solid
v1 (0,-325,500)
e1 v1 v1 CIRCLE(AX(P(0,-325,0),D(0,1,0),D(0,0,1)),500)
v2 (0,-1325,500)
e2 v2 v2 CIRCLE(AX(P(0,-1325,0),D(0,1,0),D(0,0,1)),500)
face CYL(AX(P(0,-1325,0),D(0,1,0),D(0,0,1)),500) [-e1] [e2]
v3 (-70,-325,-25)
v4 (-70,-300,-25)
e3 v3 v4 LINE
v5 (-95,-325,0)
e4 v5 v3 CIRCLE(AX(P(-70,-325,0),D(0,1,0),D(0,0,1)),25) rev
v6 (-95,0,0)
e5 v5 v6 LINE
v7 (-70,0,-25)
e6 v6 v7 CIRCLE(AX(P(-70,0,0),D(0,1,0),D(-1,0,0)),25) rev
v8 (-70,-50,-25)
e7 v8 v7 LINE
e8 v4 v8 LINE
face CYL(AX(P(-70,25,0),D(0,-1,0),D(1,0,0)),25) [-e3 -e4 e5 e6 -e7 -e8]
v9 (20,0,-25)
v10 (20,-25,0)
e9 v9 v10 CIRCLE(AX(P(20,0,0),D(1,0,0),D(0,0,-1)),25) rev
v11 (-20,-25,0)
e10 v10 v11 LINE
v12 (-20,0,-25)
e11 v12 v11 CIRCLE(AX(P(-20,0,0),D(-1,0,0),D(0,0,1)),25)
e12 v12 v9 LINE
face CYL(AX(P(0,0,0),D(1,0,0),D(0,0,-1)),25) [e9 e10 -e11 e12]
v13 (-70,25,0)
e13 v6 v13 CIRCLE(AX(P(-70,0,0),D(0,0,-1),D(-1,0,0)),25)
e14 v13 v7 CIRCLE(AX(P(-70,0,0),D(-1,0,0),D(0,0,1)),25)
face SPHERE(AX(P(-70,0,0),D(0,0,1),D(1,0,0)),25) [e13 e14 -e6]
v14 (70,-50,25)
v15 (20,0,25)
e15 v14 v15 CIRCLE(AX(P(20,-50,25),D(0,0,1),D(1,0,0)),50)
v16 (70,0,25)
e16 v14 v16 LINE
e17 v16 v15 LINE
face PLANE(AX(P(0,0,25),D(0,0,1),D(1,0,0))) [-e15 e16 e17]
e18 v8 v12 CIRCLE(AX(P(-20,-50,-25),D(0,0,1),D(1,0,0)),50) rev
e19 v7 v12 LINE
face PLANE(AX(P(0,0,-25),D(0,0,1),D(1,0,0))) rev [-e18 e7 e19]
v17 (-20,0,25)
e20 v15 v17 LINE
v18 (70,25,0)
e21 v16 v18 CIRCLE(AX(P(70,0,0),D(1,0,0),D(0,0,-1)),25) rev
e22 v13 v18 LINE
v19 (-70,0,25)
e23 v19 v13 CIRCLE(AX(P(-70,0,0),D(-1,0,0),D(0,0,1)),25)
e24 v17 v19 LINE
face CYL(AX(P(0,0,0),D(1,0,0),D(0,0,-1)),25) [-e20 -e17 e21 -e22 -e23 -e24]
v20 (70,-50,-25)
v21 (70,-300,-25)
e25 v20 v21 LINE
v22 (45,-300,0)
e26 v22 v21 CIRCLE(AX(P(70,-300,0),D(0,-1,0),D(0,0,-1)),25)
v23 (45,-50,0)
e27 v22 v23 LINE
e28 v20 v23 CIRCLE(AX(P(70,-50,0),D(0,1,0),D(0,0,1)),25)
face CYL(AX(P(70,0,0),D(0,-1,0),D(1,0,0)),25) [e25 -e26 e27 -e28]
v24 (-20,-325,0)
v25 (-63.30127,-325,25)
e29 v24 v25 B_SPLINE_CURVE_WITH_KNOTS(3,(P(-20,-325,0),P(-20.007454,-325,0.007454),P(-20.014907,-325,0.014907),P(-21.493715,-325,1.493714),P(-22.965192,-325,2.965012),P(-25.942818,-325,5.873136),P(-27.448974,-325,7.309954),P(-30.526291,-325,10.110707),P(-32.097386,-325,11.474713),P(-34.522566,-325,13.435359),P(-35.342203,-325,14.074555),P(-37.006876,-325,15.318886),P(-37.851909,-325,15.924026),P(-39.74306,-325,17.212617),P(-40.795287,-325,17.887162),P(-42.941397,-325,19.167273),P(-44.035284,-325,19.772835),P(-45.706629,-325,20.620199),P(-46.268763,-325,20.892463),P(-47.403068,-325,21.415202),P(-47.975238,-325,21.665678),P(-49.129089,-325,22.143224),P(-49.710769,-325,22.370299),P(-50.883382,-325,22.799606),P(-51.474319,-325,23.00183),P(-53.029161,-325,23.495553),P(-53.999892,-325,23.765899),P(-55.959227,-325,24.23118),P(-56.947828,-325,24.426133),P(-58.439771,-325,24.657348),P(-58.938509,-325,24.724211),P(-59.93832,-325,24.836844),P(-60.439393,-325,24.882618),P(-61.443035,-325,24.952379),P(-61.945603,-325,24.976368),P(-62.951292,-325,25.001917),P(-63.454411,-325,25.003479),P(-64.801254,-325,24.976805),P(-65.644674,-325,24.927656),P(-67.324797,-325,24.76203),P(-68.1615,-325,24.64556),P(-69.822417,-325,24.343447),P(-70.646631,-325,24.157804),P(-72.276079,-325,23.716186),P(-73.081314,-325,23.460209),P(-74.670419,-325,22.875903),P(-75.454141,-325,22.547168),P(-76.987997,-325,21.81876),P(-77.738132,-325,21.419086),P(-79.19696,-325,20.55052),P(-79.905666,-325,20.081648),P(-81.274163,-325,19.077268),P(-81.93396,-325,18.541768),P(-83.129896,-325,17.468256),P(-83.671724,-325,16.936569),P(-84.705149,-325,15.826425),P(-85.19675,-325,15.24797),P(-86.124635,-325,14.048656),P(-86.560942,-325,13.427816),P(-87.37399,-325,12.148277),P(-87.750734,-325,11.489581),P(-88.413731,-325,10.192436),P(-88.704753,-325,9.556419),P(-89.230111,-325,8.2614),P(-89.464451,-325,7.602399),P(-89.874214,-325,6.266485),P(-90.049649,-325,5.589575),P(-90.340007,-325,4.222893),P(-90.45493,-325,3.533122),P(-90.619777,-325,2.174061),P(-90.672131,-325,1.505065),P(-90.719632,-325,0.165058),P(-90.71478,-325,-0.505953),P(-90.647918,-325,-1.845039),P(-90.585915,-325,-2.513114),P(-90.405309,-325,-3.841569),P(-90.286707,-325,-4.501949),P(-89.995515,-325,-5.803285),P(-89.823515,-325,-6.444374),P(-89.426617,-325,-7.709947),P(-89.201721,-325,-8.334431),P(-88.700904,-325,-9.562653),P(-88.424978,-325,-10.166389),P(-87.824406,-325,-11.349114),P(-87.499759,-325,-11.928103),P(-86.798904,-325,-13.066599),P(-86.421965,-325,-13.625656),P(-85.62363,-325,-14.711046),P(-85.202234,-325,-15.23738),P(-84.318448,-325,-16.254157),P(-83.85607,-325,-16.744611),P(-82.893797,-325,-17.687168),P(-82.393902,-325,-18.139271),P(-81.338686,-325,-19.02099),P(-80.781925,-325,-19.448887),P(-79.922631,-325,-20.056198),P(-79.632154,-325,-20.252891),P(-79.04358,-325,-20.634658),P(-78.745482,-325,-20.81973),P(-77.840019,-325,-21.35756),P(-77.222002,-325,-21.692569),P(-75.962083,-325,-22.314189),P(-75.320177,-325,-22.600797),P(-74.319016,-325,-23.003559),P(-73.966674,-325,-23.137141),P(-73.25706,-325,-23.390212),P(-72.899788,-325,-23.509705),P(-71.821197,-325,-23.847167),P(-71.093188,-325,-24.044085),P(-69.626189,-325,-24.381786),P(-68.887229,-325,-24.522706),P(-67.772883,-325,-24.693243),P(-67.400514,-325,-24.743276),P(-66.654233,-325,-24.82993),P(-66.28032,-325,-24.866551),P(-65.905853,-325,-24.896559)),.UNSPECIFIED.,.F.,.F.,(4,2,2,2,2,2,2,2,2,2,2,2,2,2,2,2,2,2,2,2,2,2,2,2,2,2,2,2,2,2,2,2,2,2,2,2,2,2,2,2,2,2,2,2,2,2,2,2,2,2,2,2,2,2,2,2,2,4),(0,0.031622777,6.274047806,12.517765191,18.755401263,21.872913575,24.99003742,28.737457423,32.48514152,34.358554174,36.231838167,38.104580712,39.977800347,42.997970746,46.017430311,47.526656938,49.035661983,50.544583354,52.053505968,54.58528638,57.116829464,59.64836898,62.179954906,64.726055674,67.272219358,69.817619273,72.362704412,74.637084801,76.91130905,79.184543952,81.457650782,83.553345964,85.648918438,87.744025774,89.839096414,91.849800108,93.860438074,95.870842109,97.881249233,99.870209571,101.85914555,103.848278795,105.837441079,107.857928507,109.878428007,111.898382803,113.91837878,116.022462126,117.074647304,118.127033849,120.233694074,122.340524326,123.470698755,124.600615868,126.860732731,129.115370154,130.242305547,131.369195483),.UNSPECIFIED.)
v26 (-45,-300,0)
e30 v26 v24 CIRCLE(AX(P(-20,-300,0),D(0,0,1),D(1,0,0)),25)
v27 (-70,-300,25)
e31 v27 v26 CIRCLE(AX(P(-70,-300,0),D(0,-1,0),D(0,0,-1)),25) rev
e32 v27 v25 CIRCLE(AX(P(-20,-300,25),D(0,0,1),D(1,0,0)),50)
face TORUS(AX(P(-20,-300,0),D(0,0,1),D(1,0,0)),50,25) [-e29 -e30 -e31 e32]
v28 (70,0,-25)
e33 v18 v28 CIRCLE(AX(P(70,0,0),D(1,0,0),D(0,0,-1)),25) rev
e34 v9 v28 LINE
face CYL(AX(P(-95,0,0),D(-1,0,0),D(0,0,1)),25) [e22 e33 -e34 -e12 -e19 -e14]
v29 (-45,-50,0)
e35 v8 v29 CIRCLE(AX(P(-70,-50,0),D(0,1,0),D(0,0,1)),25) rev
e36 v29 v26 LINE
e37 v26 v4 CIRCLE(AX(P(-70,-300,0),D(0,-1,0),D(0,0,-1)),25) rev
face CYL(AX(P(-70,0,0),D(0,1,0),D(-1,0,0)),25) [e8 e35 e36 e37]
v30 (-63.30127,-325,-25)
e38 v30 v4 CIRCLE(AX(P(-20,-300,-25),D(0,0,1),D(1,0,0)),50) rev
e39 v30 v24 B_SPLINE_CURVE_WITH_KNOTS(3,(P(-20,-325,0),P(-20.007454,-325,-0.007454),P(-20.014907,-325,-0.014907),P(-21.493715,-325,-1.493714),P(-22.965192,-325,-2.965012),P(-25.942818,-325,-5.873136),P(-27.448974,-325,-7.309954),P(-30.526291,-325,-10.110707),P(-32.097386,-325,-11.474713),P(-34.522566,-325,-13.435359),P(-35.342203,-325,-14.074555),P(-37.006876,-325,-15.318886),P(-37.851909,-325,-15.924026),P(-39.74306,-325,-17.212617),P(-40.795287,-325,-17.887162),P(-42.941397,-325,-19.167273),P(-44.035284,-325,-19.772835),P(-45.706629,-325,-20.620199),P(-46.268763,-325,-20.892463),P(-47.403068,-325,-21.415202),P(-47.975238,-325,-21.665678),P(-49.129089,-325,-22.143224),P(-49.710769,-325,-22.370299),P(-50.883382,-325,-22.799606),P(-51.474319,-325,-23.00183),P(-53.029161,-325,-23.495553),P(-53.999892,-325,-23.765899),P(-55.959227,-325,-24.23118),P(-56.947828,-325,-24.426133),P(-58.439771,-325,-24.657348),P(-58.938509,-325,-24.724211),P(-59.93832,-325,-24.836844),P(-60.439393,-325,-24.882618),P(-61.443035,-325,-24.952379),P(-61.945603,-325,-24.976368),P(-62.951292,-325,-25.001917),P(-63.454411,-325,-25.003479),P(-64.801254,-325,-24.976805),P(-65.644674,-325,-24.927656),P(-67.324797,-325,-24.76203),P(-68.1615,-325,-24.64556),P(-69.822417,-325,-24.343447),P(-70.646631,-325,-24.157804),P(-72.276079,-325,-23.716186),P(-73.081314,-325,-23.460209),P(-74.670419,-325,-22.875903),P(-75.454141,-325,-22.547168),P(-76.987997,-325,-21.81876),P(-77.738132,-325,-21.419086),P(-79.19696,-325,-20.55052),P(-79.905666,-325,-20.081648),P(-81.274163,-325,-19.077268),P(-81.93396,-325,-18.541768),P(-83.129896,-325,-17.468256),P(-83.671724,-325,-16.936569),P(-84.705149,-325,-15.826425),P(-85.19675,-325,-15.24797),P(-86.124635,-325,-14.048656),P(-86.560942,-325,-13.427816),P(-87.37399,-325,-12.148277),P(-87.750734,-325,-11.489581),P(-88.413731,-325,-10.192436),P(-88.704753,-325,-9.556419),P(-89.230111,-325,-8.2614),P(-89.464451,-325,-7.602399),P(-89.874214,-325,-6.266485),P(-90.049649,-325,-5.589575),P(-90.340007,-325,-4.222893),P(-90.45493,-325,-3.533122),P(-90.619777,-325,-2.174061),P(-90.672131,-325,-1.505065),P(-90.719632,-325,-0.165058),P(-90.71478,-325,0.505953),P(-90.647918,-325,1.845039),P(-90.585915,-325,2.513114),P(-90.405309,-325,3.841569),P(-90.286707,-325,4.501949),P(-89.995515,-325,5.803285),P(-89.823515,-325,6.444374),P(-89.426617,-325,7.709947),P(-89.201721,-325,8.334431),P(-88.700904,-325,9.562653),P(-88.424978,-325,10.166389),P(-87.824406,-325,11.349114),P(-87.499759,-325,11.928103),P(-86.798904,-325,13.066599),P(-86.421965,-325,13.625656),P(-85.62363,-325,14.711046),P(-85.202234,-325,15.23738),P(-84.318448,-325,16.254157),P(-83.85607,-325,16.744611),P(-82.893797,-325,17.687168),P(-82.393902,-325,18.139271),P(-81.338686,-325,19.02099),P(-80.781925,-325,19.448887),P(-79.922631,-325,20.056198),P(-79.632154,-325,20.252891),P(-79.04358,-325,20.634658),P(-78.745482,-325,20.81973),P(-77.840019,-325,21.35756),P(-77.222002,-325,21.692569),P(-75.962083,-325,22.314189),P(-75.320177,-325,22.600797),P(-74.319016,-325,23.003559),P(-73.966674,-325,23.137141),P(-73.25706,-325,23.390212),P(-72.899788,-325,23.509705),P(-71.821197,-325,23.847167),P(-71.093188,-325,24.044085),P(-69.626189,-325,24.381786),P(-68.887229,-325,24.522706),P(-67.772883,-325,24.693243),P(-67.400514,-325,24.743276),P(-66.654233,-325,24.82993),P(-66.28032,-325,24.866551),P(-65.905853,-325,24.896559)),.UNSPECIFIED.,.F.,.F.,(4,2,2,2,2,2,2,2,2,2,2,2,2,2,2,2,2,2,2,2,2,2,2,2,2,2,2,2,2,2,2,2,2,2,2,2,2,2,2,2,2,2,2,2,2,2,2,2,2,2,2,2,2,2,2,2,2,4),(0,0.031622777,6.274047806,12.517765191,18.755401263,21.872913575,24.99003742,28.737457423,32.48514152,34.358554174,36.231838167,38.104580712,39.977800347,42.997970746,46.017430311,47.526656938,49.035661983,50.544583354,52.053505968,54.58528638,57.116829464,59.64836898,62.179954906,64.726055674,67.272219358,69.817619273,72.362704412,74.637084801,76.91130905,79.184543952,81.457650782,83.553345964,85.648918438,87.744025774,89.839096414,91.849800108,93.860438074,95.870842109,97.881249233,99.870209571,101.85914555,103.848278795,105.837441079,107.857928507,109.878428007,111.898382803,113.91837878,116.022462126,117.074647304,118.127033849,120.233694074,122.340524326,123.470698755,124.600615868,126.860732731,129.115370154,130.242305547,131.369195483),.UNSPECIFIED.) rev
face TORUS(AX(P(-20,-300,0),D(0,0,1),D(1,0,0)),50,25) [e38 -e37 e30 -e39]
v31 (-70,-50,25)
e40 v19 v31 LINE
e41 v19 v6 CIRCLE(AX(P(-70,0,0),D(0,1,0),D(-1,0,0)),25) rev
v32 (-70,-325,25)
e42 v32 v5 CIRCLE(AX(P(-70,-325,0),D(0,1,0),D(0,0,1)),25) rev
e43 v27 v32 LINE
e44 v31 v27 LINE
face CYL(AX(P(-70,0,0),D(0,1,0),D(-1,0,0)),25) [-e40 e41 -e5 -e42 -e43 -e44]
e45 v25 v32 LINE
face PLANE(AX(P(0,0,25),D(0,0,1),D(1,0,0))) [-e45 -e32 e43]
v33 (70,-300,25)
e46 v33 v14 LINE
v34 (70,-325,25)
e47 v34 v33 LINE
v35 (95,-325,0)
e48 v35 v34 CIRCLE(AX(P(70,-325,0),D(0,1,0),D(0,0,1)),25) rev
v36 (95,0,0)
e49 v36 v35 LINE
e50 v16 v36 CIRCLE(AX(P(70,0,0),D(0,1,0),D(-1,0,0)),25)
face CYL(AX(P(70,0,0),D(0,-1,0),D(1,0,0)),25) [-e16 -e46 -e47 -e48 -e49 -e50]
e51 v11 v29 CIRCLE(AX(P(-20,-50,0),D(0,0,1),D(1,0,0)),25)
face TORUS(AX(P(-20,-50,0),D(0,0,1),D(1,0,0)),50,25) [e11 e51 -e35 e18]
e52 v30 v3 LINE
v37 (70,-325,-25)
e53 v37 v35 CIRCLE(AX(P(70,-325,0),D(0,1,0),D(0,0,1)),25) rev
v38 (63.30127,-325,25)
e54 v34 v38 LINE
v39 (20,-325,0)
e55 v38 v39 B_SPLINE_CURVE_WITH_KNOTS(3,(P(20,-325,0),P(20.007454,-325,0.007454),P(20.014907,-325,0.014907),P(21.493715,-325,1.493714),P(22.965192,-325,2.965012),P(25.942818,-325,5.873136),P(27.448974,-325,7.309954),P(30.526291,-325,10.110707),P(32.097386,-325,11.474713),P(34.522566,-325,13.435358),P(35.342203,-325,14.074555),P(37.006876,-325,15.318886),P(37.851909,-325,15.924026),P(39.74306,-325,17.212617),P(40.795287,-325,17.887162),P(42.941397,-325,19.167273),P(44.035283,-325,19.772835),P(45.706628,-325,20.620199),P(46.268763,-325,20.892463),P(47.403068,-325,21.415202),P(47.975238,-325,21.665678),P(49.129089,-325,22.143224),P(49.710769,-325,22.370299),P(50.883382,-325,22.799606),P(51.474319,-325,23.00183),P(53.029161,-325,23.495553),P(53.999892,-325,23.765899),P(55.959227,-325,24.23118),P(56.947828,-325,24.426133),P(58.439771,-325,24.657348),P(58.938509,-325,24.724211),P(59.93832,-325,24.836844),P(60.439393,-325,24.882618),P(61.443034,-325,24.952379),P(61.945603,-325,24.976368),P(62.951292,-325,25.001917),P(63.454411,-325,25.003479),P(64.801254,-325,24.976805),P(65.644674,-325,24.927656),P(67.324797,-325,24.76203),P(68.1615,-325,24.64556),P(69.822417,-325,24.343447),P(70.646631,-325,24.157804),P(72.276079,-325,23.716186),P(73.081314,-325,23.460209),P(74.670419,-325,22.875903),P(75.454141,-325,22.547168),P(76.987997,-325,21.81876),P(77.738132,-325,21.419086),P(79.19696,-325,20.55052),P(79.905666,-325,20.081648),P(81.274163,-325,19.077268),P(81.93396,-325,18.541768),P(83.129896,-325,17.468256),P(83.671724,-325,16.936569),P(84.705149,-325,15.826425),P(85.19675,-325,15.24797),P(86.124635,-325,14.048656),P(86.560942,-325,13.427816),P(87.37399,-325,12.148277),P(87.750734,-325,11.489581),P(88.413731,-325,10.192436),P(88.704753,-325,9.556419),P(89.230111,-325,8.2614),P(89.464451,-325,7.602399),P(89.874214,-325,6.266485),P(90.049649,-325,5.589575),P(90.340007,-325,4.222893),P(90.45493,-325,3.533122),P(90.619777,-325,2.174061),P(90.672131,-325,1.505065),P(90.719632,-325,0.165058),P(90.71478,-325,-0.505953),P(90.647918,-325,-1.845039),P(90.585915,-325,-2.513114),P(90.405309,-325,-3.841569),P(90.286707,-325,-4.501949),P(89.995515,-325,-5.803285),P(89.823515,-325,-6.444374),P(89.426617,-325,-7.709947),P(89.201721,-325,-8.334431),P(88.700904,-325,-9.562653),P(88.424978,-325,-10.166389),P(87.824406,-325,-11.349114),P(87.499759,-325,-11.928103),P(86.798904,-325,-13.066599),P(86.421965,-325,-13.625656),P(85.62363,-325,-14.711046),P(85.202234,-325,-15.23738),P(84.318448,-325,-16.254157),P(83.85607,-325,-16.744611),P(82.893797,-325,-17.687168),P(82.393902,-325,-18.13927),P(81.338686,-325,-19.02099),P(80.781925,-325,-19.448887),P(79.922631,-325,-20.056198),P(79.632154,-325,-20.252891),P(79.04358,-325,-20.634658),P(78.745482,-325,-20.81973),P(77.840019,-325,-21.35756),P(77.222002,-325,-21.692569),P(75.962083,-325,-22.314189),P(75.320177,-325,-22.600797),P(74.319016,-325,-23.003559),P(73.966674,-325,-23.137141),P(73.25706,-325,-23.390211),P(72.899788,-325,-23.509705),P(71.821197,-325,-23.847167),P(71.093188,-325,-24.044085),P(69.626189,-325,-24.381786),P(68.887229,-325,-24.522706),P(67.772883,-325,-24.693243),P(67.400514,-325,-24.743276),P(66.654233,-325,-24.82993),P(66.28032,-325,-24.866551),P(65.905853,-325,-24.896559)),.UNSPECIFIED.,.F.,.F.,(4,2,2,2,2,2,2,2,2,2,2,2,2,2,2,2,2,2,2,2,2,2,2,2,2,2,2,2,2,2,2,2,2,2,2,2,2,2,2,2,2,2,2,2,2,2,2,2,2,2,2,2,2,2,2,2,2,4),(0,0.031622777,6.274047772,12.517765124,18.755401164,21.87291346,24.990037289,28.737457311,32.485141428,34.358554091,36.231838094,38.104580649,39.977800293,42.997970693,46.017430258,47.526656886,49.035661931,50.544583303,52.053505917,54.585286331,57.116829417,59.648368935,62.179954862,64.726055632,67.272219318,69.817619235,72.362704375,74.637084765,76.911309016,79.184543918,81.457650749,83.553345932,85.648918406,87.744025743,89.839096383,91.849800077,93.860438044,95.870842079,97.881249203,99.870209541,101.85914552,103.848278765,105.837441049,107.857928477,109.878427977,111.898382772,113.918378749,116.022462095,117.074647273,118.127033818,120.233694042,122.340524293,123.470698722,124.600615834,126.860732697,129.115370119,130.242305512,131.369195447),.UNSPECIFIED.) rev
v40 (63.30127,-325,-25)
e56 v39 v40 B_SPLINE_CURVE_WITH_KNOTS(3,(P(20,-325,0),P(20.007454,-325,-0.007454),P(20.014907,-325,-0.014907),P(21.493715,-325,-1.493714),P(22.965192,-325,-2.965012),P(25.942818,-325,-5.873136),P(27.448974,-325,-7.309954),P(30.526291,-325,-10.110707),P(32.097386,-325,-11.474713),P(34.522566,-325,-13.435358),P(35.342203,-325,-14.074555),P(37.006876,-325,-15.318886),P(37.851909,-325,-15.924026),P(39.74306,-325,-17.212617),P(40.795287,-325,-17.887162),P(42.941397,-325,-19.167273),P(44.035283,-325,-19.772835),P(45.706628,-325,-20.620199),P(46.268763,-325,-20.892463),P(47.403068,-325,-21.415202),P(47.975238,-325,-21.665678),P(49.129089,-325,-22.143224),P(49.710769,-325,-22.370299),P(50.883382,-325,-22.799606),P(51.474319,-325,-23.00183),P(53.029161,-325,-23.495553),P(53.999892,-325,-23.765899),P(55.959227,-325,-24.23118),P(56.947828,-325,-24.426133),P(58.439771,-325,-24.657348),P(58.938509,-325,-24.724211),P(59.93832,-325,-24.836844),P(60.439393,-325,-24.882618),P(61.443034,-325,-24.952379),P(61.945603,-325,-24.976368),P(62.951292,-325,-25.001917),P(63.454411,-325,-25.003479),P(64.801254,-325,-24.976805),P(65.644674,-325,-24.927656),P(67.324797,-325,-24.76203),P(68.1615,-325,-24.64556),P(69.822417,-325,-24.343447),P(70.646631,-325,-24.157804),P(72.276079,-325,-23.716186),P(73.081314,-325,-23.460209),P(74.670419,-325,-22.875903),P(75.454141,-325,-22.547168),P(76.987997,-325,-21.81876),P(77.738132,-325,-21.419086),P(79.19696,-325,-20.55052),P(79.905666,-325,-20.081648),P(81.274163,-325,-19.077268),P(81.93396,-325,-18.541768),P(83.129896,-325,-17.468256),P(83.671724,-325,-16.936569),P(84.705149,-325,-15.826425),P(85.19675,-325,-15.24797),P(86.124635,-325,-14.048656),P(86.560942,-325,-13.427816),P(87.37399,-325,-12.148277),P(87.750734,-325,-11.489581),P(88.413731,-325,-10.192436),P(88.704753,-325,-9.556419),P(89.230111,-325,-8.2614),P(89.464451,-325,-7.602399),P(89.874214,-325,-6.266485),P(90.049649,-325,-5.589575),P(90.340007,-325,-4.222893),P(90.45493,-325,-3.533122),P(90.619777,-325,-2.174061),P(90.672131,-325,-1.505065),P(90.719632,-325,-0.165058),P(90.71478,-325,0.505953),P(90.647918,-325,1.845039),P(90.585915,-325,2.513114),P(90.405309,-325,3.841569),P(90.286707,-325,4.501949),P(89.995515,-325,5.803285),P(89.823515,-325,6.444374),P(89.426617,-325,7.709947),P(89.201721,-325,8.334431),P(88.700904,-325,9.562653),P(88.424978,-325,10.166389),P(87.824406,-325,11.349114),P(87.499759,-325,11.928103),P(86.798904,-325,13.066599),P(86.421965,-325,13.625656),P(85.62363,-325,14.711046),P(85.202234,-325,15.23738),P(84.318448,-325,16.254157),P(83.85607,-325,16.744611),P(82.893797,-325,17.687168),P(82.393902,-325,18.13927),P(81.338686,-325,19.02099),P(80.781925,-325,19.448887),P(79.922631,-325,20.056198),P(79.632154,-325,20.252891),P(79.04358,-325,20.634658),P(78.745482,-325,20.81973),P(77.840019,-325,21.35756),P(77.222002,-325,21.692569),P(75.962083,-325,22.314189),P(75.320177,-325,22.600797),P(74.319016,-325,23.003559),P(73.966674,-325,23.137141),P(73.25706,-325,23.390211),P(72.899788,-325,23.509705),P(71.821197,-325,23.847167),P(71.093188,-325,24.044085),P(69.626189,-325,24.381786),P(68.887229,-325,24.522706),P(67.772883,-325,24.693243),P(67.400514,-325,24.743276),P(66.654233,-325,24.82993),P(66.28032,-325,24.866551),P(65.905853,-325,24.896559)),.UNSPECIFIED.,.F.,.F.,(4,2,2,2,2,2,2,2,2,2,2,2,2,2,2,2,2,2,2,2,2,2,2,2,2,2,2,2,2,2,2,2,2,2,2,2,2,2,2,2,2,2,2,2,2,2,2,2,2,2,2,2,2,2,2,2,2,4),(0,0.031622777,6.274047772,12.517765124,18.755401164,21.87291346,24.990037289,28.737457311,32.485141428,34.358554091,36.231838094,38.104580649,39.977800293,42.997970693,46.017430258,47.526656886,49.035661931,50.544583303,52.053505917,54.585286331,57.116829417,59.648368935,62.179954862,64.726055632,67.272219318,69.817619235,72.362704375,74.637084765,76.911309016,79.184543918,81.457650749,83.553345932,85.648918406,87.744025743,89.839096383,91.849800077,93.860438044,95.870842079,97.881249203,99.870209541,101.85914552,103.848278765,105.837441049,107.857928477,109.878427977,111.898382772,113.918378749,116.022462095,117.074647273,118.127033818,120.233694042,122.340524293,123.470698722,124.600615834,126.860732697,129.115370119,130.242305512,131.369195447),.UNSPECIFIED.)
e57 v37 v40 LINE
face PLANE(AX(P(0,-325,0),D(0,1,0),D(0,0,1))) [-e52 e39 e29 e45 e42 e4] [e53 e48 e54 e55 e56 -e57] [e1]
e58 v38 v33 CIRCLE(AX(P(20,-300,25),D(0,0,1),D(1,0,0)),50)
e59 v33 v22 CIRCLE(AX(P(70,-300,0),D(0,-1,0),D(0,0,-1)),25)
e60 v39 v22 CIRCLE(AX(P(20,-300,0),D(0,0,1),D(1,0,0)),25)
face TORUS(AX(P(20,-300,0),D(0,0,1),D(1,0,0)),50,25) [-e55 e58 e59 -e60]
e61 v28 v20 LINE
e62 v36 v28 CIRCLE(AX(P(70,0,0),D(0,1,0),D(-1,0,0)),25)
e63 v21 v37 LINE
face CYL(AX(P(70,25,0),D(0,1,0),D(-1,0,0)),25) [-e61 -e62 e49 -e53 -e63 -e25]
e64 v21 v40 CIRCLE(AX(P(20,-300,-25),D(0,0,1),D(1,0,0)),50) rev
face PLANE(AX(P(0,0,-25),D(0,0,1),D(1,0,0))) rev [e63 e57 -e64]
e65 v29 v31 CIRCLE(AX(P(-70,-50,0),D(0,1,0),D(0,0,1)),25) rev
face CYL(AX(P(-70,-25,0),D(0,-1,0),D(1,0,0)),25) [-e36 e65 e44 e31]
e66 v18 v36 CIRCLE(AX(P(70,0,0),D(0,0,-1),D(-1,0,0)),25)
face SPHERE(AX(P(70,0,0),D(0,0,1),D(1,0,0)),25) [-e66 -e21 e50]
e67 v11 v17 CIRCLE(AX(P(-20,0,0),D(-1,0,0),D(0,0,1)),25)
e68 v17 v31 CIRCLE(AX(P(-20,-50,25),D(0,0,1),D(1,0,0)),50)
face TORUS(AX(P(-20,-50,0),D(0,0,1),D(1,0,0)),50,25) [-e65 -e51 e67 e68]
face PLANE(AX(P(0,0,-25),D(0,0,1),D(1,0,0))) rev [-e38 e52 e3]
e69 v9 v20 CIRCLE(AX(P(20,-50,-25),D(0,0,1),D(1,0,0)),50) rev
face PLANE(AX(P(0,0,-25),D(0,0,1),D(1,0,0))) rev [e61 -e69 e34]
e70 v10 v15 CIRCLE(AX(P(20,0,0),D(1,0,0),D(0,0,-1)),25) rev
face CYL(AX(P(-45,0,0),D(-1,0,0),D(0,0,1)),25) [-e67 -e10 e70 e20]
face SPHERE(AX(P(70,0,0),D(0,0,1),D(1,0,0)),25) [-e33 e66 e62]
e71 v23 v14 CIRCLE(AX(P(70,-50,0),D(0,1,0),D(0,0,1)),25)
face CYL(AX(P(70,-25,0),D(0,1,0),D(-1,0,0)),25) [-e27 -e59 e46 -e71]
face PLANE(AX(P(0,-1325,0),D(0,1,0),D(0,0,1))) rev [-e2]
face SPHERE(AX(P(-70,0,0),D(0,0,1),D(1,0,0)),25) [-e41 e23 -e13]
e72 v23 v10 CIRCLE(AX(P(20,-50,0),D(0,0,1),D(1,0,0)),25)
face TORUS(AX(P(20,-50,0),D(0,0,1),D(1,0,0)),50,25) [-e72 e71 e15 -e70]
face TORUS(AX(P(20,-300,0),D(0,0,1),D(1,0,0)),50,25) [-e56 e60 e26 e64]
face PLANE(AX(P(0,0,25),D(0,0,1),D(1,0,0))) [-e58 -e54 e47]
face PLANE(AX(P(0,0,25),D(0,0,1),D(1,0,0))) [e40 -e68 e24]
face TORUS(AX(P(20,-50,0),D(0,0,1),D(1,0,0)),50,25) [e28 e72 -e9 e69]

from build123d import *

# Parameters (mm, degrees)
SKETCH1_W           = 190
SKETCH1_H           = 400
SKETCH1_W_2         = 90
SKETCH1_H_2         = 300
BOSS_EXTRUDE1_DEPTH = 25
FILLET1_R           = 25
SKETCH2_R           = 500
BOSS_EXTRUDE2_DEPTH = 1000


with BuildPart() as part:
    # Sketch1 → Boss-Extrude1 (new, symmetric)
    with BuildSketch(Plane.XY):
        with Locations((0, -175)):
            Rectangle(SKETCH1_W, SKETCH1_H)
        with Locations((0, -175)):
            Rectangle(SKETCH1_W_2, SKETCH1_H_2, mode=Mode.SUBTRACT)
    extrude(amount=BOSS_EXTRUDE1_DEPTH, both=True)

    # Fillet1
    fillet1_edges = [part.edges().sort_by_distance(p)[0] for p in [
        (95, -175, 25),
        (0, 25, 25),
        (-45, -175, -25),
        (-45, -25, 0),
        (0, -325, -25),
        (-45, -325, 0),
        (45, -175, -25),
        (45, -325, 0),
        (0, -25, -25),
        (45, -25, 0),
        (-45, -175, 25),
        (0, -325, 25),
        (45, -175, 25),
        (0, -25, 25),
        (-95, -175, 25),
        (0, 25, -25),
        (95, -175, -25),
        (0, -375, -25),
        (-95, -175, -25),
        (0, -375, 25),
        (-95, 25, 0),
        (95, 25, 0),
        (95, -375, 0),
        (-95, -375, 0),
    ]]
    fillet(fillet1_edges, radius=FILLET1_R - 0.0001)  # a hair under: the kernel refuses the full size

    # Sketch2 → Boss-Extrude2 (add)
    with BuildSketch(Plane(origin=(0, -325, 0), x_dir=(1, 0, 0), z_dir=(0, 1, 0))):
        with Locations(Location((0, 0, 0), (0, 0, 270))):
            Circle(SKETCH2_R)
    extrude(amount=-BOSS_EXTRUDE2_DEPTH)


solid = part.part
